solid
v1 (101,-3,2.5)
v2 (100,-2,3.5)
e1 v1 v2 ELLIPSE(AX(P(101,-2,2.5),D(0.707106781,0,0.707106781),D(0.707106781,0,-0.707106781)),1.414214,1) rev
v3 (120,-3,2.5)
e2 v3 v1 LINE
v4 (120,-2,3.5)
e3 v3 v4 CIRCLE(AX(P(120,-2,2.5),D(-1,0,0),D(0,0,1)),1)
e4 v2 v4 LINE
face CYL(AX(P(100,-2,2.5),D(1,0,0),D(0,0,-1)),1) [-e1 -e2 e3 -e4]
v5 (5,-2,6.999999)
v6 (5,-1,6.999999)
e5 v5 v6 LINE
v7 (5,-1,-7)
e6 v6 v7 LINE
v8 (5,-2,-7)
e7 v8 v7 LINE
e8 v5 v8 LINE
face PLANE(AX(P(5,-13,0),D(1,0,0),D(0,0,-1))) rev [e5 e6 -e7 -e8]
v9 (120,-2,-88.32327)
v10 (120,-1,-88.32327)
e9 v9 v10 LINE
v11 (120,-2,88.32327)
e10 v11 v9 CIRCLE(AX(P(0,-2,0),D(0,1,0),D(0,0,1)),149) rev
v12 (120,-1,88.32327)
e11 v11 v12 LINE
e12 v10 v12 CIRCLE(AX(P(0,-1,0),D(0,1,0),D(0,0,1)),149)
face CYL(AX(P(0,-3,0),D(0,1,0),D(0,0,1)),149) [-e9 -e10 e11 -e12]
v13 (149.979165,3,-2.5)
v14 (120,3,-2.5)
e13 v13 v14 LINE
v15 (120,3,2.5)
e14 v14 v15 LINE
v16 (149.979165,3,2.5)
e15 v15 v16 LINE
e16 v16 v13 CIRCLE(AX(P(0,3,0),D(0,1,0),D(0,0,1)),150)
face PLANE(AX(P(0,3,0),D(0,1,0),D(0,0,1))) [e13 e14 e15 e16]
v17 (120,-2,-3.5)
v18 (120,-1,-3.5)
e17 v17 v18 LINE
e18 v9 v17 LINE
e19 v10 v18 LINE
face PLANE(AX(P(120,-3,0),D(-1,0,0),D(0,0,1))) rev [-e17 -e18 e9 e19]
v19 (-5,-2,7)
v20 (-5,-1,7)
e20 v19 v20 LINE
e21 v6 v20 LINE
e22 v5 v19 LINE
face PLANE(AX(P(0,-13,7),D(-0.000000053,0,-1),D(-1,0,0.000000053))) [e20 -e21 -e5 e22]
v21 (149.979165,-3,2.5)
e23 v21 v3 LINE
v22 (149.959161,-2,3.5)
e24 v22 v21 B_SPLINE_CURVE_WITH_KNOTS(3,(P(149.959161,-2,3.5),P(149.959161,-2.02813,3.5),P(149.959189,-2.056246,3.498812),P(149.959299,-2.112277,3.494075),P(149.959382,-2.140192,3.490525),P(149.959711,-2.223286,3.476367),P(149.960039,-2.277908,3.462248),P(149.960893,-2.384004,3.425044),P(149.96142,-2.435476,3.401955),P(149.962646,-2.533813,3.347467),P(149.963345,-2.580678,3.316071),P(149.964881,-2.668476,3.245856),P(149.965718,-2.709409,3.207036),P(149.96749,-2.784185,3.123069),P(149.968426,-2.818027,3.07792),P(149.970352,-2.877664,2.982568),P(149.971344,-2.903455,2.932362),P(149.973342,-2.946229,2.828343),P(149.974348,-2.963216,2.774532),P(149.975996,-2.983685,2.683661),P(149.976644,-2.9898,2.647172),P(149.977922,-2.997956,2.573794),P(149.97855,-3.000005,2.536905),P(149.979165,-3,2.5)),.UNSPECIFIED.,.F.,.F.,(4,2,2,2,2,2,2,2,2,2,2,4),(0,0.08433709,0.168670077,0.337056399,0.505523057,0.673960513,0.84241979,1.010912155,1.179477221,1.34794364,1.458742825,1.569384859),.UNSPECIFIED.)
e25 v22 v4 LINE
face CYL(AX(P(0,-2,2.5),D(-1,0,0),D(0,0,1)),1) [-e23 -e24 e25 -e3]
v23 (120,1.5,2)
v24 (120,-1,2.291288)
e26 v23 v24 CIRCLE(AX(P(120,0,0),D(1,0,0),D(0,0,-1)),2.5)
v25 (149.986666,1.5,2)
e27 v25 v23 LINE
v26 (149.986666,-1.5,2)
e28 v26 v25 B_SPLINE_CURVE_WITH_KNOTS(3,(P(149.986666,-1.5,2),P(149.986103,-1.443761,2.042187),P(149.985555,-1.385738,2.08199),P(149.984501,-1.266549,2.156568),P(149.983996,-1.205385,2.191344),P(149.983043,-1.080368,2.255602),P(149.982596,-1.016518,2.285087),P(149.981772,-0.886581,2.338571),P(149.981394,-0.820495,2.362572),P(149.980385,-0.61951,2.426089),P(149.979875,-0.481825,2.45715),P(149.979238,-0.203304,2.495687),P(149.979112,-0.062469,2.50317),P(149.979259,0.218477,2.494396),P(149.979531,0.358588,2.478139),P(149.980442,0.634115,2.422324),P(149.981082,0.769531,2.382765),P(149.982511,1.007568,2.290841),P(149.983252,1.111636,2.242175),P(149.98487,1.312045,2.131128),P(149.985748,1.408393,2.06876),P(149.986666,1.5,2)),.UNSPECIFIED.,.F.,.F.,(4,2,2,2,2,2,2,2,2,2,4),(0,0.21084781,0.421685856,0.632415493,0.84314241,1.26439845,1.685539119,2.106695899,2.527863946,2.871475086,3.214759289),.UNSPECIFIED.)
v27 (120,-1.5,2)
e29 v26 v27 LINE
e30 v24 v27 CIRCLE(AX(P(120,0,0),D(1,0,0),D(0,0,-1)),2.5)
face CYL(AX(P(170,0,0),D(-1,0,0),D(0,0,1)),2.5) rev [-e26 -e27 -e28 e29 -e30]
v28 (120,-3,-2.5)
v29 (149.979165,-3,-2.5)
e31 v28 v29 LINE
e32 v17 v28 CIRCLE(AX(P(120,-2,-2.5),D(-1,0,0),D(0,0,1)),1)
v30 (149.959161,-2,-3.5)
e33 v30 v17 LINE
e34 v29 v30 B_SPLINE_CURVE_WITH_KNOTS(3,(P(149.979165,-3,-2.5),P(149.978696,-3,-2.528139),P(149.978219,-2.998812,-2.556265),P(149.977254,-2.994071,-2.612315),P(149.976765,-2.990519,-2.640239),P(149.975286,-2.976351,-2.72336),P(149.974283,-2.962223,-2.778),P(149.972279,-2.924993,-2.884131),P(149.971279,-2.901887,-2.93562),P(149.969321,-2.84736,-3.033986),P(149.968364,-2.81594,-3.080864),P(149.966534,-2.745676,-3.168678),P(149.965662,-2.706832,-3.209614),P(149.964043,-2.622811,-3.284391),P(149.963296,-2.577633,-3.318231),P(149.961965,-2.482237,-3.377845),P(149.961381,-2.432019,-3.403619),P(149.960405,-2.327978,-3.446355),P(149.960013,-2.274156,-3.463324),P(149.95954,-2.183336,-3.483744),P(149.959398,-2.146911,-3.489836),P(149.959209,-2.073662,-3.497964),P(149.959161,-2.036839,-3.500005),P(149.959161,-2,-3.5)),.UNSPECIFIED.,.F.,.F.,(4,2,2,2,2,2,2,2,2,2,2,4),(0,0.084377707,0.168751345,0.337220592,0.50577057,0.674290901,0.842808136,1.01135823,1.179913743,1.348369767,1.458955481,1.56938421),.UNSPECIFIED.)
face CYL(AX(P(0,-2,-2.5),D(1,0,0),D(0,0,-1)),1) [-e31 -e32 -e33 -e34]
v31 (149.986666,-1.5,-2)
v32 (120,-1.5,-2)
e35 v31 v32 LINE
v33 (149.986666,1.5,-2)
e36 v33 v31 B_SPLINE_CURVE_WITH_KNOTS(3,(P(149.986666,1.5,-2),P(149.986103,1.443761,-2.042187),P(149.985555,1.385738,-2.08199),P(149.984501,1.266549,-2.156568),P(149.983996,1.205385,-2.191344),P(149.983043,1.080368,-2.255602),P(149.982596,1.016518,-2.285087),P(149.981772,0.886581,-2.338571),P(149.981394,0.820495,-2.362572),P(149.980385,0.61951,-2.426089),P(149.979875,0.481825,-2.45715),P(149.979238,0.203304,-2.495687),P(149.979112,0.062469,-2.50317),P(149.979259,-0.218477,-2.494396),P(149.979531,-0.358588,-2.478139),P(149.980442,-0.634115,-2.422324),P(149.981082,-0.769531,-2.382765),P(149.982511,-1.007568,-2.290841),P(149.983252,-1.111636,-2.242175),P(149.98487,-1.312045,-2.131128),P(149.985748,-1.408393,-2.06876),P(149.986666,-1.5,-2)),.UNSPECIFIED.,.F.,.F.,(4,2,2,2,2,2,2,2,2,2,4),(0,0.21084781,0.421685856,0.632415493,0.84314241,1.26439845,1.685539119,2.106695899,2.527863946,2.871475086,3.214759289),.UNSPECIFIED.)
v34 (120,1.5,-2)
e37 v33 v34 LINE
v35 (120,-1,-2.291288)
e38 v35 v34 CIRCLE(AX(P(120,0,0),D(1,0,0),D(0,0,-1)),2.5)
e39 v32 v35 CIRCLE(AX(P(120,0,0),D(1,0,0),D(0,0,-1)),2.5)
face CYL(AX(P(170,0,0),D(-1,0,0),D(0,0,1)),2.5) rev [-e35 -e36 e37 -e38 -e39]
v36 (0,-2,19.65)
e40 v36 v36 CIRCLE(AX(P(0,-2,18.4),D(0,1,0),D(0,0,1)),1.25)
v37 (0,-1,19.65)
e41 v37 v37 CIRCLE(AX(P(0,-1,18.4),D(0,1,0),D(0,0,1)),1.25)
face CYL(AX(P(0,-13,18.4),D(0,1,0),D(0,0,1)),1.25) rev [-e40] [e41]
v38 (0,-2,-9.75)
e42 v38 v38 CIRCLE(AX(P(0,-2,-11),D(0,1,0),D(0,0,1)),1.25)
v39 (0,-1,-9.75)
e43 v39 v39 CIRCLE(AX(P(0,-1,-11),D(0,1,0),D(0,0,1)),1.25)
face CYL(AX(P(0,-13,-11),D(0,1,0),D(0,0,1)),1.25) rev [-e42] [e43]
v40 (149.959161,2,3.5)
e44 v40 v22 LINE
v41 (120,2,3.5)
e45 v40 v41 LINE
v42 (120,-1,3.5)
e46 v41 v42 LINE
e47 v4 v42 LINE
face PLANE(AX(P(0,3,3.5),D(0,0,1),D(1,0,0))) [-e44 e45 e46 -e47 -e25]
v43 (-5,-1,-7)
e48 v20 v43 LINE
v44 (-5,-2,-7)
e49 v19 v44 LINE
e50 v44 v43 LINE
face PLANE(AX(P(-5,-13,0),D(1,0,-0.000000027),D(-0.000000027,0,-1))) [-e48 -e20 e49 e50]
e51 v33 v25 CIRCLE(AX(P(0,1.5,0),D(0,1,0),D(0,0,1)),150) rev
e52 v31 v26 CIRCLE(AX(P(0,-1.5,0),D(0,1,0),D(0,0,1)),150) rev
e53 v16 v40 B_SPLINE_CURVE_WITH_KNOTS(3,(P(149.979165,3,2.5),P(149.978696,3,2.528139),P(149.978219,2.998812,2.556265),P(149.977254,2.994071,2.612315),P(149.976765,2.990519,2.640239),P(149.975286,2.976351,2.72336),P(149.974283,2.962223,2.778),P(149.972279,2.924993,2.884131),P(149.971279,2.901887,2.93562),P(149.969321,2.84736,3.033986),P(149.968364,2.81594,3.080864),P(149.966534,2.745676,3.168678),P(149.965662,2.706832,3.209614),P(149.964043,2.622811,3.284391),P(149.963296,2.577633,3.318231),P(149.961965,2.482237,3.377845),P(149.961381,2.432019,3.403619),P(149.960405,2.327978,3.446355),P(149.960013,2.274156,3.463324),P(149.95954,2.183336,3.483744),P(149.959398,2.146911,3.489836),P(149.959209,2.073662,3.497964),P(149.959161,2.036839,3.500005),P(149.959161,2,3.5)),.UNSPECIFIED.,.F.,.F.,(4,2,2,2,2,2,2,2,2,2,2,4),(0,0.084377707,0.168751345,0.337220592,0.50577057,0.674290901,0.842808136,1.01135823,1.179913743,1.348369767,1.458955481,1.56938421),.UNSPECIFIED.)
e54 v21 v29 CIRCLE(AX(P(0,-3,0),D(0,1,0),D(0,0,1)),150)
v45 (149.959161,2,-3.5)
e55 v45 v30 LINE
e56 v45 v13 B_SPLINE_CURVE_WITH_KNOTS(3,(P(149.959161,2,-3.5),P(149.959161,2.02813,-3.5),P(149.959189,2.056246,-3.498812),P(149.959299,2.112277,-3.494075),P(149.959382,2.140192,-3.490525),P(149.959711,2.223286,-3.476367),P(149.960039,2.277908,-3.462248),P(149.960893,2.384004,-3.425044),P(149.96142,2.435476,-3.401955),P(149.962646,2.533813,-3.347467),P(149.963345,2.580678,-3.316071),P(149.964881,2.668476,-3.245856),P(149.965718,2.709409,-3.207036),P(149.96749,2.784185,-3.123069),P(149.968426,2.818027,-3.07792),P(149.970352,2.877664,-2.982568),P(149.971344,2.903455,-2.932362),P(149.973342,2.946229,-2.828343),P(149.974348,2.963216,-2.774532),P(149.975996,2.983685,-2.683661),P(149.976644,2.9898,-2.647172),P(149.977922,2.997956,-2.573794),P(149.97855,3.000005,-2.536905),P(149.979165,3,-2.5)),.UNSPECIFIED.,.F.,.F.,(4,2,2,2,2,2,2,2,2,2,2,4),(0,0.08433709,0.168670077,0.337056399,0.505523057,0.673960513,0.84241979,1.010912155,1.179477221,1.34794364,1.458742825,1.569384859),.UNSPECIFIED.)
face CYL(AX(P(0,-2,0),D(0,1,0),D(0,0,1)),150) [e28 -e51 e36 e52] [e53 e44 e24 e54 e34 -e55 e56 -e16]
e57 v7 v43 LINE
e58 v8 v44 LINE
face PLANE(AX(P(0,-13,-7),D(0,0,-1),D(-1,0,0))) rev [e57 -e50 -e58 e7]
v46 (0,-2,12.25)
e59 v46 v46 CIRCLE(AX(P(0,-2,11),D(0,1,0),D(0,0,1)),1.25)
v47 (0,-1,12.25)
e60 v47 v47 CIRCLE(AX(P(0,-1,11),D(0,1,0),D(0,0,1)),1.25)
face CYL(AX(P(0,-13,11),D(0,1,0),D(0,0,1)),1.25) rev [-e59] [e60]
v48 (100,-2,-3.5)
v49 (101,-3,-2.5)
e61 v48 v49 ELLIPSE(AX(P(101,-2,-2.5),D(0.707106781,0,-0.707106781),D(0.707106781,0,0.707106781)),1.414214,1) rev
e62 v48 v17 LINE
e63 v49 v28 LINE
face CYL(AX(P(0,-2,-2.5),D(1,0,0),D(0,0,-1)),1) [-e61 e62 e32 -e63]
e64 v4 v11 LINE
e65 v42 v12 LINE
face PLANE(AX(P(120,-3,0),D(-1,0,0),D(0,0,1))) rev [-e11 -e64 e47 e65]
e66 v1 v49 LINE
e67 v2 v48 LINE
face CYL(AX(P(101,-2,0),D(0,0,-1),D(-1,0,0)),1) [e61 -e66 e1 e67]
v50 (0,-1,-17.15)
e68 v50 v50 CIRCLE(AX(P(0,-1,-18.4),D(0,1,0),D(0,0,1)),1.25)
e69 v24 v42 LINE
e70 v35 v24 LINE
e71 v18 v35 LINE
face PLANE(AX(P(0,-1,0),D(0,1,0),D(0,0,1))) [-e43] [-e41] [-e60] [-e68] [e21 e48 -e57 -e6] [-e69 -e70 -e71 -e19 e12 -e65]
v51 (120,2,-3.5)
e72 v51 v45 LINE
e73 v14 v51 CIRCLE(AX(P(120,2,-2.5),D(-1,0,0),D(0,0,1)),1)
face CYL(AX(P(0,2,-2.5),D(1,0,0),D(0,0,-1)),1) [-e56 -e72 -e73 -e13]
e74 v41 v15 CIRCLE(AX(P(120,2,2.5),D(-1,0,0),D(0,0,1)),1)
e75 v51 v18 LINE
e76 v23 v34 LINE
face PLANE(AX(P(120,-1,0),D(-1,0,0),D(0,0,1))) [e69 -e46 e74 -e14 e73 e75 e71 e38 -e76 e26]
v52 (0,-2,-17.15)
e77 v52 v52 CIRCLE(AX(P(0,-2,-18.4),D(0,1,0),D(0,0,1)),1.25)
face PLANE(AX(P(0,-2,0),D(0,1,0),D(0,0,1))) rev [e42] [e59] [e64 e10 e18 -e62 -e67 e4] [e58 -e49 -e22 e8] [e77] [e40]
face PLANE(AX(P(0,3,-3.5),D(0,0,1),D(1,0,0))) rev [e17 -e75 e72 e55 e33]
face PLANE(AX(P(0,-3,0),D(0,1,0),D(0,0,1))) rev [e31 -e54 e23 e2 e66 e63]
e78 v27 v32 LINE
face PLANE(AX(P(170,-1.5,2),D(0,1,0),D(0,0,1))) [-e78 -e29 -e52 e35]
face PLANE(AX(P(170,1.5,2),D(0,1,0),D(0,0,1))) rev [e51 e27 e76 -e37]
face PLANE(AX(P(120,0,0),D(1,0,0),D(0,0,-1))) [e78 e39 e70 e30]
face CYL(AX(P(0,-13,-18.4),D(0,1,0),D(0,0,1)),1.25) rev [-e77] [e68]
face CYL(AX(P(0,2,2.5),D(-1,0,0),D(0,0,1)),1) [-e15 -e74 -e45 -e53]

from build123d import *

# Parameters (mm, degrees)
ESQUISSE1_R             = 150
BOSS_EXTRU_1_DEPTH      = 2
ESQUISSE1_4_R           = 1.25
ENL_V_MAT_EXTRU_1_DEPTH = 1
ESQUISSE1_5_R           = 1.25
ENL_V_MAT_EXTRU_2_DEPTH = 13
BOSS_EXTRU_3_START      = 3
BOSS_EXTRU_3_DEPTH      = 3
BOSS_EXTRU_4_DEPTH      = 3
ENL_V_MAT_EXTRU_3_DEPTH = 50
CONG_1_R                = 1
ESQUISSE5_R             = 1
ENL_V_MAT_EXTRU_4_DEPTH = 180
ENL_V_MAT_EXTRU_5_DEPTH = 213.153246642
ESQUISSE7_W             = 7
ESQUISSE7_H             = 1
BOSS_EXTRU_5_DEPTH      = 20
CONG_3_R                = 1


with BuildPart() as part:
    # Esquisse1 → Boss.-Extru.1 (new body)
    with BuildSketch(Plane(origin=(0, 0, 0), x_dir=(1, 0, 0), z_dir=(0, 1, 0))):
        with Locations(Location((0, 0, 0), (0, 0, 270))):
            Circle(ESQUISSE1_R)
    extrude(amount=-BOSS_EXTRU_1_DEPTH)

    # Esquisse1<4> → Enlèv. mat.-Extru.1 (cut)
    with BuildSketch(Plane(origin=(0, 0, 0), x_dir=(1, 0, 0), z_dir=(0, 1, 0))):
        with BuildLine():
            Line((120, -88.323269867), (120, 88.323269867))
            ThreePointArc((120, 88.323269867), (-149, 0), (120, -88.323269867))
        make_face()
        with Locations(Location((0, -18.4, 0), (0, 0, 270))):
            Circle(ESQUISSE1_4_R, mode=Mode.SUBTRACT)
        with Locations(Location((0, -11, 0), (0, 0, 270))):
            Circle(ESQUISSE1_4_R, mode=Mode.SUBTRACT)
        Polygon((5, 7), (5, -6.999999465), (-5, -7), (-5.000000382, 7), align=None, mode=Mode.SUBTRACT)
        with Locations(Location((0, 11, 0), (0, 0, 270))):
            Circle(ESQUISSE1_4_R, mode=Mode.SUBTRACT)
        with Locations(Location((0, 18.4, 0), (0, 0, 270))):
            Circle(ESQUISSE1_4_R, mode=Mode.SUBTRACT)
    extrude(amount=-ENL_V_MAT_EXTRU_1_DEPTH, mode=Mode.SUBTRACT)

    # Esquisse1<5> → Enlèv. mat.-Extru.2 (cut)
    with BuildSketch(Plane(origin=(0, 0, 0), x_dir=(1, 0, 0), z_dir=(0, 1, 0))):
        Polygon((5, -6.999999465), (5, 7), (-5.000000382, 7), (-5, -7), align=None)
        with Locations(Location((0, -11, 0), (0, 0, 270))):
            Circle(ESQUISSE1_5_R)
        with Locations(Location((0, -18.4, 0), (0, 0, 270))):
            Circle(ESQUISSE1_5_R)
        with Locations(Location((0, 11, 0), (0, 0, 270))):
            Circle(ESQUISSE1_5_R)
        with Locations(Location((0, 18.4, 0), (0, 0, 270))):
            Circle(ESQUISSE1_5_R)
    extrude(amount=-ENL_V_MAT_EXTRU_2_DEPTH, mode=Mode.SUBTRACT)

    # Esquisse3 → Boss.-Extru.3 (add)
    with BuildSketch(Plane(origin=(0, 0, 0), x_dir=(1, 0, 0), z_dir=(0, 1, 0)).offset(BOSS_EXTRU_3_START)):
        with BuildLine():
            Line((120, -3.5), (149.959161107, -3.5))
            ThreePointArc((149.959161107, -3.5), (149.989789929, -1.750119126), (150, 0))
            ThreePointArc((150, 0), (149.989789929, 1.750119126), (149.959161107, 3.5))
            Line((149.959161107, 3.5), (120, 3.5))
            Line((120, 3.5), (120, -3.5))
        make_face()
    extrude(amount=-BOSS_EXTRU_3_DEPTH)

    # Esquisse3<2> → Boss.-Extru.4 (add)
    with BuildSketch(Plane(origin=(0, 0, 0), x_dir=(1, 0, 0), z_dir=(0, 1, 0))):
        with BuildLine():
            Line((120, -3.5), (149.959161107, -3.5))
            ThreePointArc((149.959161107, -3.5), (149.989789929, -1.750119126), (150, 0))
            ThreePointArc((150, 0), (149.989789929, 1.750119126), (149.959161107, 3.5))
            Line((149.959161107, 3.5), (120, 3.5))
            Line((120, 3.5), (120, -3.5))
        make_face()
    extrude(amount=-BOSS_EXTRU_4_DEPTH)

    # Esquisse4 → Enlèv. mat.-Extru.3 (cut)
    with BuildSketch(Plane(origin=(120, 0, 0), x_dir=(0, 0, -1), z_dir=(1, 0, 0))):
        with BuildLine():
            Line((-2, 1.5), (2, 1.5))
            ThreePointArc((2, 1.5), (2.5, 0), (2, -1.5))
            Line((2, -1.5), (-2, -1.5))
            ThreePointArc((-2, -1.5), (-2.5, 0), (-2, 1.5))
        make_face()
    extrude(amount=ENL_V_MAT_EXTRU_3_DEPTH, mode=Mode.SUBTRACT)

    # Congé1
    cong_1_edges = [part.edges().sort_by_distance(p)[0] for p in [
        (134.979580554, -3, -3.5),
        (134.979580554, -3, 3.5),
        (134.979580554, 3, 3.5),
        (134.979580554, 3, -3.5),
    ]]
    fillet(cong_1_edges, radius=CONG_1_R - 0.0001)  # a hair under: the kernel refuses the full size

    # Esquisse5 → Enlèv. mat.-Extru.4 (cut)
    with BuildSketch(Plane(origin=(0, 0, 0), x_dir=(0, 0, -1), z_dir=(1, 0, 0))):
        Circle(ESQUISSE5_R)
    extrude(amount=-ENL_V_MAT_EXTRU_4_DEPTH, mode=Mode.SUBTRACT)

    # Esquisse3<4> → Enlèv. mat.-Extru.5 (cut, through all)
    with BuildSketch(Plane(origin=(0, 0, 0), x_dir=(1, 0, 0), z_dir=(0, 1, 0))):
        with BuildLine():
            ThreePointArc((149.959161107, 3.5), (-150, 0), (149.959161107, -3.5))
            Line((149.959161107, -3.5), (120, -3.5))
            Line((120, -3.5), (120, -88.323269867))
            ThreePointArc((120, -88.323269867), (-149, 0), (120, 88.323269867))
            Line((120, 88.323269867), (120, 3.5))
            Line((120, 3.5), (149.959161107, 3.5))
        make_face()
    extrude(amount=-ENL_V_MAT_EXTRU_5_DEPTH, mode=Mode.SUBTRACT)

    # Esquisse7 → Boss.-Extru.5 (add)
    with BuildSketch(Plane.ZY.offset(-120)):
        with Locations((0, -2.5)):
            Rectangle(ESQUISSE7_W, ESQUISSE7_H)
    extrude(amount=BOSS_EXTRU_5_DEPTH)

    # Congé3
    cong_3_edges = [part.edges().sort_by_distance(p)[0] for p in [
        (100, -3, 0),
        (110, -3, -3.5),
        (110, -3, 3.5),
    ]]
    fillet(cong_3_edges, radius=CONG_3_R - 0.0001)  # a hair under: the kernel refuses the full size


solid = part.part
